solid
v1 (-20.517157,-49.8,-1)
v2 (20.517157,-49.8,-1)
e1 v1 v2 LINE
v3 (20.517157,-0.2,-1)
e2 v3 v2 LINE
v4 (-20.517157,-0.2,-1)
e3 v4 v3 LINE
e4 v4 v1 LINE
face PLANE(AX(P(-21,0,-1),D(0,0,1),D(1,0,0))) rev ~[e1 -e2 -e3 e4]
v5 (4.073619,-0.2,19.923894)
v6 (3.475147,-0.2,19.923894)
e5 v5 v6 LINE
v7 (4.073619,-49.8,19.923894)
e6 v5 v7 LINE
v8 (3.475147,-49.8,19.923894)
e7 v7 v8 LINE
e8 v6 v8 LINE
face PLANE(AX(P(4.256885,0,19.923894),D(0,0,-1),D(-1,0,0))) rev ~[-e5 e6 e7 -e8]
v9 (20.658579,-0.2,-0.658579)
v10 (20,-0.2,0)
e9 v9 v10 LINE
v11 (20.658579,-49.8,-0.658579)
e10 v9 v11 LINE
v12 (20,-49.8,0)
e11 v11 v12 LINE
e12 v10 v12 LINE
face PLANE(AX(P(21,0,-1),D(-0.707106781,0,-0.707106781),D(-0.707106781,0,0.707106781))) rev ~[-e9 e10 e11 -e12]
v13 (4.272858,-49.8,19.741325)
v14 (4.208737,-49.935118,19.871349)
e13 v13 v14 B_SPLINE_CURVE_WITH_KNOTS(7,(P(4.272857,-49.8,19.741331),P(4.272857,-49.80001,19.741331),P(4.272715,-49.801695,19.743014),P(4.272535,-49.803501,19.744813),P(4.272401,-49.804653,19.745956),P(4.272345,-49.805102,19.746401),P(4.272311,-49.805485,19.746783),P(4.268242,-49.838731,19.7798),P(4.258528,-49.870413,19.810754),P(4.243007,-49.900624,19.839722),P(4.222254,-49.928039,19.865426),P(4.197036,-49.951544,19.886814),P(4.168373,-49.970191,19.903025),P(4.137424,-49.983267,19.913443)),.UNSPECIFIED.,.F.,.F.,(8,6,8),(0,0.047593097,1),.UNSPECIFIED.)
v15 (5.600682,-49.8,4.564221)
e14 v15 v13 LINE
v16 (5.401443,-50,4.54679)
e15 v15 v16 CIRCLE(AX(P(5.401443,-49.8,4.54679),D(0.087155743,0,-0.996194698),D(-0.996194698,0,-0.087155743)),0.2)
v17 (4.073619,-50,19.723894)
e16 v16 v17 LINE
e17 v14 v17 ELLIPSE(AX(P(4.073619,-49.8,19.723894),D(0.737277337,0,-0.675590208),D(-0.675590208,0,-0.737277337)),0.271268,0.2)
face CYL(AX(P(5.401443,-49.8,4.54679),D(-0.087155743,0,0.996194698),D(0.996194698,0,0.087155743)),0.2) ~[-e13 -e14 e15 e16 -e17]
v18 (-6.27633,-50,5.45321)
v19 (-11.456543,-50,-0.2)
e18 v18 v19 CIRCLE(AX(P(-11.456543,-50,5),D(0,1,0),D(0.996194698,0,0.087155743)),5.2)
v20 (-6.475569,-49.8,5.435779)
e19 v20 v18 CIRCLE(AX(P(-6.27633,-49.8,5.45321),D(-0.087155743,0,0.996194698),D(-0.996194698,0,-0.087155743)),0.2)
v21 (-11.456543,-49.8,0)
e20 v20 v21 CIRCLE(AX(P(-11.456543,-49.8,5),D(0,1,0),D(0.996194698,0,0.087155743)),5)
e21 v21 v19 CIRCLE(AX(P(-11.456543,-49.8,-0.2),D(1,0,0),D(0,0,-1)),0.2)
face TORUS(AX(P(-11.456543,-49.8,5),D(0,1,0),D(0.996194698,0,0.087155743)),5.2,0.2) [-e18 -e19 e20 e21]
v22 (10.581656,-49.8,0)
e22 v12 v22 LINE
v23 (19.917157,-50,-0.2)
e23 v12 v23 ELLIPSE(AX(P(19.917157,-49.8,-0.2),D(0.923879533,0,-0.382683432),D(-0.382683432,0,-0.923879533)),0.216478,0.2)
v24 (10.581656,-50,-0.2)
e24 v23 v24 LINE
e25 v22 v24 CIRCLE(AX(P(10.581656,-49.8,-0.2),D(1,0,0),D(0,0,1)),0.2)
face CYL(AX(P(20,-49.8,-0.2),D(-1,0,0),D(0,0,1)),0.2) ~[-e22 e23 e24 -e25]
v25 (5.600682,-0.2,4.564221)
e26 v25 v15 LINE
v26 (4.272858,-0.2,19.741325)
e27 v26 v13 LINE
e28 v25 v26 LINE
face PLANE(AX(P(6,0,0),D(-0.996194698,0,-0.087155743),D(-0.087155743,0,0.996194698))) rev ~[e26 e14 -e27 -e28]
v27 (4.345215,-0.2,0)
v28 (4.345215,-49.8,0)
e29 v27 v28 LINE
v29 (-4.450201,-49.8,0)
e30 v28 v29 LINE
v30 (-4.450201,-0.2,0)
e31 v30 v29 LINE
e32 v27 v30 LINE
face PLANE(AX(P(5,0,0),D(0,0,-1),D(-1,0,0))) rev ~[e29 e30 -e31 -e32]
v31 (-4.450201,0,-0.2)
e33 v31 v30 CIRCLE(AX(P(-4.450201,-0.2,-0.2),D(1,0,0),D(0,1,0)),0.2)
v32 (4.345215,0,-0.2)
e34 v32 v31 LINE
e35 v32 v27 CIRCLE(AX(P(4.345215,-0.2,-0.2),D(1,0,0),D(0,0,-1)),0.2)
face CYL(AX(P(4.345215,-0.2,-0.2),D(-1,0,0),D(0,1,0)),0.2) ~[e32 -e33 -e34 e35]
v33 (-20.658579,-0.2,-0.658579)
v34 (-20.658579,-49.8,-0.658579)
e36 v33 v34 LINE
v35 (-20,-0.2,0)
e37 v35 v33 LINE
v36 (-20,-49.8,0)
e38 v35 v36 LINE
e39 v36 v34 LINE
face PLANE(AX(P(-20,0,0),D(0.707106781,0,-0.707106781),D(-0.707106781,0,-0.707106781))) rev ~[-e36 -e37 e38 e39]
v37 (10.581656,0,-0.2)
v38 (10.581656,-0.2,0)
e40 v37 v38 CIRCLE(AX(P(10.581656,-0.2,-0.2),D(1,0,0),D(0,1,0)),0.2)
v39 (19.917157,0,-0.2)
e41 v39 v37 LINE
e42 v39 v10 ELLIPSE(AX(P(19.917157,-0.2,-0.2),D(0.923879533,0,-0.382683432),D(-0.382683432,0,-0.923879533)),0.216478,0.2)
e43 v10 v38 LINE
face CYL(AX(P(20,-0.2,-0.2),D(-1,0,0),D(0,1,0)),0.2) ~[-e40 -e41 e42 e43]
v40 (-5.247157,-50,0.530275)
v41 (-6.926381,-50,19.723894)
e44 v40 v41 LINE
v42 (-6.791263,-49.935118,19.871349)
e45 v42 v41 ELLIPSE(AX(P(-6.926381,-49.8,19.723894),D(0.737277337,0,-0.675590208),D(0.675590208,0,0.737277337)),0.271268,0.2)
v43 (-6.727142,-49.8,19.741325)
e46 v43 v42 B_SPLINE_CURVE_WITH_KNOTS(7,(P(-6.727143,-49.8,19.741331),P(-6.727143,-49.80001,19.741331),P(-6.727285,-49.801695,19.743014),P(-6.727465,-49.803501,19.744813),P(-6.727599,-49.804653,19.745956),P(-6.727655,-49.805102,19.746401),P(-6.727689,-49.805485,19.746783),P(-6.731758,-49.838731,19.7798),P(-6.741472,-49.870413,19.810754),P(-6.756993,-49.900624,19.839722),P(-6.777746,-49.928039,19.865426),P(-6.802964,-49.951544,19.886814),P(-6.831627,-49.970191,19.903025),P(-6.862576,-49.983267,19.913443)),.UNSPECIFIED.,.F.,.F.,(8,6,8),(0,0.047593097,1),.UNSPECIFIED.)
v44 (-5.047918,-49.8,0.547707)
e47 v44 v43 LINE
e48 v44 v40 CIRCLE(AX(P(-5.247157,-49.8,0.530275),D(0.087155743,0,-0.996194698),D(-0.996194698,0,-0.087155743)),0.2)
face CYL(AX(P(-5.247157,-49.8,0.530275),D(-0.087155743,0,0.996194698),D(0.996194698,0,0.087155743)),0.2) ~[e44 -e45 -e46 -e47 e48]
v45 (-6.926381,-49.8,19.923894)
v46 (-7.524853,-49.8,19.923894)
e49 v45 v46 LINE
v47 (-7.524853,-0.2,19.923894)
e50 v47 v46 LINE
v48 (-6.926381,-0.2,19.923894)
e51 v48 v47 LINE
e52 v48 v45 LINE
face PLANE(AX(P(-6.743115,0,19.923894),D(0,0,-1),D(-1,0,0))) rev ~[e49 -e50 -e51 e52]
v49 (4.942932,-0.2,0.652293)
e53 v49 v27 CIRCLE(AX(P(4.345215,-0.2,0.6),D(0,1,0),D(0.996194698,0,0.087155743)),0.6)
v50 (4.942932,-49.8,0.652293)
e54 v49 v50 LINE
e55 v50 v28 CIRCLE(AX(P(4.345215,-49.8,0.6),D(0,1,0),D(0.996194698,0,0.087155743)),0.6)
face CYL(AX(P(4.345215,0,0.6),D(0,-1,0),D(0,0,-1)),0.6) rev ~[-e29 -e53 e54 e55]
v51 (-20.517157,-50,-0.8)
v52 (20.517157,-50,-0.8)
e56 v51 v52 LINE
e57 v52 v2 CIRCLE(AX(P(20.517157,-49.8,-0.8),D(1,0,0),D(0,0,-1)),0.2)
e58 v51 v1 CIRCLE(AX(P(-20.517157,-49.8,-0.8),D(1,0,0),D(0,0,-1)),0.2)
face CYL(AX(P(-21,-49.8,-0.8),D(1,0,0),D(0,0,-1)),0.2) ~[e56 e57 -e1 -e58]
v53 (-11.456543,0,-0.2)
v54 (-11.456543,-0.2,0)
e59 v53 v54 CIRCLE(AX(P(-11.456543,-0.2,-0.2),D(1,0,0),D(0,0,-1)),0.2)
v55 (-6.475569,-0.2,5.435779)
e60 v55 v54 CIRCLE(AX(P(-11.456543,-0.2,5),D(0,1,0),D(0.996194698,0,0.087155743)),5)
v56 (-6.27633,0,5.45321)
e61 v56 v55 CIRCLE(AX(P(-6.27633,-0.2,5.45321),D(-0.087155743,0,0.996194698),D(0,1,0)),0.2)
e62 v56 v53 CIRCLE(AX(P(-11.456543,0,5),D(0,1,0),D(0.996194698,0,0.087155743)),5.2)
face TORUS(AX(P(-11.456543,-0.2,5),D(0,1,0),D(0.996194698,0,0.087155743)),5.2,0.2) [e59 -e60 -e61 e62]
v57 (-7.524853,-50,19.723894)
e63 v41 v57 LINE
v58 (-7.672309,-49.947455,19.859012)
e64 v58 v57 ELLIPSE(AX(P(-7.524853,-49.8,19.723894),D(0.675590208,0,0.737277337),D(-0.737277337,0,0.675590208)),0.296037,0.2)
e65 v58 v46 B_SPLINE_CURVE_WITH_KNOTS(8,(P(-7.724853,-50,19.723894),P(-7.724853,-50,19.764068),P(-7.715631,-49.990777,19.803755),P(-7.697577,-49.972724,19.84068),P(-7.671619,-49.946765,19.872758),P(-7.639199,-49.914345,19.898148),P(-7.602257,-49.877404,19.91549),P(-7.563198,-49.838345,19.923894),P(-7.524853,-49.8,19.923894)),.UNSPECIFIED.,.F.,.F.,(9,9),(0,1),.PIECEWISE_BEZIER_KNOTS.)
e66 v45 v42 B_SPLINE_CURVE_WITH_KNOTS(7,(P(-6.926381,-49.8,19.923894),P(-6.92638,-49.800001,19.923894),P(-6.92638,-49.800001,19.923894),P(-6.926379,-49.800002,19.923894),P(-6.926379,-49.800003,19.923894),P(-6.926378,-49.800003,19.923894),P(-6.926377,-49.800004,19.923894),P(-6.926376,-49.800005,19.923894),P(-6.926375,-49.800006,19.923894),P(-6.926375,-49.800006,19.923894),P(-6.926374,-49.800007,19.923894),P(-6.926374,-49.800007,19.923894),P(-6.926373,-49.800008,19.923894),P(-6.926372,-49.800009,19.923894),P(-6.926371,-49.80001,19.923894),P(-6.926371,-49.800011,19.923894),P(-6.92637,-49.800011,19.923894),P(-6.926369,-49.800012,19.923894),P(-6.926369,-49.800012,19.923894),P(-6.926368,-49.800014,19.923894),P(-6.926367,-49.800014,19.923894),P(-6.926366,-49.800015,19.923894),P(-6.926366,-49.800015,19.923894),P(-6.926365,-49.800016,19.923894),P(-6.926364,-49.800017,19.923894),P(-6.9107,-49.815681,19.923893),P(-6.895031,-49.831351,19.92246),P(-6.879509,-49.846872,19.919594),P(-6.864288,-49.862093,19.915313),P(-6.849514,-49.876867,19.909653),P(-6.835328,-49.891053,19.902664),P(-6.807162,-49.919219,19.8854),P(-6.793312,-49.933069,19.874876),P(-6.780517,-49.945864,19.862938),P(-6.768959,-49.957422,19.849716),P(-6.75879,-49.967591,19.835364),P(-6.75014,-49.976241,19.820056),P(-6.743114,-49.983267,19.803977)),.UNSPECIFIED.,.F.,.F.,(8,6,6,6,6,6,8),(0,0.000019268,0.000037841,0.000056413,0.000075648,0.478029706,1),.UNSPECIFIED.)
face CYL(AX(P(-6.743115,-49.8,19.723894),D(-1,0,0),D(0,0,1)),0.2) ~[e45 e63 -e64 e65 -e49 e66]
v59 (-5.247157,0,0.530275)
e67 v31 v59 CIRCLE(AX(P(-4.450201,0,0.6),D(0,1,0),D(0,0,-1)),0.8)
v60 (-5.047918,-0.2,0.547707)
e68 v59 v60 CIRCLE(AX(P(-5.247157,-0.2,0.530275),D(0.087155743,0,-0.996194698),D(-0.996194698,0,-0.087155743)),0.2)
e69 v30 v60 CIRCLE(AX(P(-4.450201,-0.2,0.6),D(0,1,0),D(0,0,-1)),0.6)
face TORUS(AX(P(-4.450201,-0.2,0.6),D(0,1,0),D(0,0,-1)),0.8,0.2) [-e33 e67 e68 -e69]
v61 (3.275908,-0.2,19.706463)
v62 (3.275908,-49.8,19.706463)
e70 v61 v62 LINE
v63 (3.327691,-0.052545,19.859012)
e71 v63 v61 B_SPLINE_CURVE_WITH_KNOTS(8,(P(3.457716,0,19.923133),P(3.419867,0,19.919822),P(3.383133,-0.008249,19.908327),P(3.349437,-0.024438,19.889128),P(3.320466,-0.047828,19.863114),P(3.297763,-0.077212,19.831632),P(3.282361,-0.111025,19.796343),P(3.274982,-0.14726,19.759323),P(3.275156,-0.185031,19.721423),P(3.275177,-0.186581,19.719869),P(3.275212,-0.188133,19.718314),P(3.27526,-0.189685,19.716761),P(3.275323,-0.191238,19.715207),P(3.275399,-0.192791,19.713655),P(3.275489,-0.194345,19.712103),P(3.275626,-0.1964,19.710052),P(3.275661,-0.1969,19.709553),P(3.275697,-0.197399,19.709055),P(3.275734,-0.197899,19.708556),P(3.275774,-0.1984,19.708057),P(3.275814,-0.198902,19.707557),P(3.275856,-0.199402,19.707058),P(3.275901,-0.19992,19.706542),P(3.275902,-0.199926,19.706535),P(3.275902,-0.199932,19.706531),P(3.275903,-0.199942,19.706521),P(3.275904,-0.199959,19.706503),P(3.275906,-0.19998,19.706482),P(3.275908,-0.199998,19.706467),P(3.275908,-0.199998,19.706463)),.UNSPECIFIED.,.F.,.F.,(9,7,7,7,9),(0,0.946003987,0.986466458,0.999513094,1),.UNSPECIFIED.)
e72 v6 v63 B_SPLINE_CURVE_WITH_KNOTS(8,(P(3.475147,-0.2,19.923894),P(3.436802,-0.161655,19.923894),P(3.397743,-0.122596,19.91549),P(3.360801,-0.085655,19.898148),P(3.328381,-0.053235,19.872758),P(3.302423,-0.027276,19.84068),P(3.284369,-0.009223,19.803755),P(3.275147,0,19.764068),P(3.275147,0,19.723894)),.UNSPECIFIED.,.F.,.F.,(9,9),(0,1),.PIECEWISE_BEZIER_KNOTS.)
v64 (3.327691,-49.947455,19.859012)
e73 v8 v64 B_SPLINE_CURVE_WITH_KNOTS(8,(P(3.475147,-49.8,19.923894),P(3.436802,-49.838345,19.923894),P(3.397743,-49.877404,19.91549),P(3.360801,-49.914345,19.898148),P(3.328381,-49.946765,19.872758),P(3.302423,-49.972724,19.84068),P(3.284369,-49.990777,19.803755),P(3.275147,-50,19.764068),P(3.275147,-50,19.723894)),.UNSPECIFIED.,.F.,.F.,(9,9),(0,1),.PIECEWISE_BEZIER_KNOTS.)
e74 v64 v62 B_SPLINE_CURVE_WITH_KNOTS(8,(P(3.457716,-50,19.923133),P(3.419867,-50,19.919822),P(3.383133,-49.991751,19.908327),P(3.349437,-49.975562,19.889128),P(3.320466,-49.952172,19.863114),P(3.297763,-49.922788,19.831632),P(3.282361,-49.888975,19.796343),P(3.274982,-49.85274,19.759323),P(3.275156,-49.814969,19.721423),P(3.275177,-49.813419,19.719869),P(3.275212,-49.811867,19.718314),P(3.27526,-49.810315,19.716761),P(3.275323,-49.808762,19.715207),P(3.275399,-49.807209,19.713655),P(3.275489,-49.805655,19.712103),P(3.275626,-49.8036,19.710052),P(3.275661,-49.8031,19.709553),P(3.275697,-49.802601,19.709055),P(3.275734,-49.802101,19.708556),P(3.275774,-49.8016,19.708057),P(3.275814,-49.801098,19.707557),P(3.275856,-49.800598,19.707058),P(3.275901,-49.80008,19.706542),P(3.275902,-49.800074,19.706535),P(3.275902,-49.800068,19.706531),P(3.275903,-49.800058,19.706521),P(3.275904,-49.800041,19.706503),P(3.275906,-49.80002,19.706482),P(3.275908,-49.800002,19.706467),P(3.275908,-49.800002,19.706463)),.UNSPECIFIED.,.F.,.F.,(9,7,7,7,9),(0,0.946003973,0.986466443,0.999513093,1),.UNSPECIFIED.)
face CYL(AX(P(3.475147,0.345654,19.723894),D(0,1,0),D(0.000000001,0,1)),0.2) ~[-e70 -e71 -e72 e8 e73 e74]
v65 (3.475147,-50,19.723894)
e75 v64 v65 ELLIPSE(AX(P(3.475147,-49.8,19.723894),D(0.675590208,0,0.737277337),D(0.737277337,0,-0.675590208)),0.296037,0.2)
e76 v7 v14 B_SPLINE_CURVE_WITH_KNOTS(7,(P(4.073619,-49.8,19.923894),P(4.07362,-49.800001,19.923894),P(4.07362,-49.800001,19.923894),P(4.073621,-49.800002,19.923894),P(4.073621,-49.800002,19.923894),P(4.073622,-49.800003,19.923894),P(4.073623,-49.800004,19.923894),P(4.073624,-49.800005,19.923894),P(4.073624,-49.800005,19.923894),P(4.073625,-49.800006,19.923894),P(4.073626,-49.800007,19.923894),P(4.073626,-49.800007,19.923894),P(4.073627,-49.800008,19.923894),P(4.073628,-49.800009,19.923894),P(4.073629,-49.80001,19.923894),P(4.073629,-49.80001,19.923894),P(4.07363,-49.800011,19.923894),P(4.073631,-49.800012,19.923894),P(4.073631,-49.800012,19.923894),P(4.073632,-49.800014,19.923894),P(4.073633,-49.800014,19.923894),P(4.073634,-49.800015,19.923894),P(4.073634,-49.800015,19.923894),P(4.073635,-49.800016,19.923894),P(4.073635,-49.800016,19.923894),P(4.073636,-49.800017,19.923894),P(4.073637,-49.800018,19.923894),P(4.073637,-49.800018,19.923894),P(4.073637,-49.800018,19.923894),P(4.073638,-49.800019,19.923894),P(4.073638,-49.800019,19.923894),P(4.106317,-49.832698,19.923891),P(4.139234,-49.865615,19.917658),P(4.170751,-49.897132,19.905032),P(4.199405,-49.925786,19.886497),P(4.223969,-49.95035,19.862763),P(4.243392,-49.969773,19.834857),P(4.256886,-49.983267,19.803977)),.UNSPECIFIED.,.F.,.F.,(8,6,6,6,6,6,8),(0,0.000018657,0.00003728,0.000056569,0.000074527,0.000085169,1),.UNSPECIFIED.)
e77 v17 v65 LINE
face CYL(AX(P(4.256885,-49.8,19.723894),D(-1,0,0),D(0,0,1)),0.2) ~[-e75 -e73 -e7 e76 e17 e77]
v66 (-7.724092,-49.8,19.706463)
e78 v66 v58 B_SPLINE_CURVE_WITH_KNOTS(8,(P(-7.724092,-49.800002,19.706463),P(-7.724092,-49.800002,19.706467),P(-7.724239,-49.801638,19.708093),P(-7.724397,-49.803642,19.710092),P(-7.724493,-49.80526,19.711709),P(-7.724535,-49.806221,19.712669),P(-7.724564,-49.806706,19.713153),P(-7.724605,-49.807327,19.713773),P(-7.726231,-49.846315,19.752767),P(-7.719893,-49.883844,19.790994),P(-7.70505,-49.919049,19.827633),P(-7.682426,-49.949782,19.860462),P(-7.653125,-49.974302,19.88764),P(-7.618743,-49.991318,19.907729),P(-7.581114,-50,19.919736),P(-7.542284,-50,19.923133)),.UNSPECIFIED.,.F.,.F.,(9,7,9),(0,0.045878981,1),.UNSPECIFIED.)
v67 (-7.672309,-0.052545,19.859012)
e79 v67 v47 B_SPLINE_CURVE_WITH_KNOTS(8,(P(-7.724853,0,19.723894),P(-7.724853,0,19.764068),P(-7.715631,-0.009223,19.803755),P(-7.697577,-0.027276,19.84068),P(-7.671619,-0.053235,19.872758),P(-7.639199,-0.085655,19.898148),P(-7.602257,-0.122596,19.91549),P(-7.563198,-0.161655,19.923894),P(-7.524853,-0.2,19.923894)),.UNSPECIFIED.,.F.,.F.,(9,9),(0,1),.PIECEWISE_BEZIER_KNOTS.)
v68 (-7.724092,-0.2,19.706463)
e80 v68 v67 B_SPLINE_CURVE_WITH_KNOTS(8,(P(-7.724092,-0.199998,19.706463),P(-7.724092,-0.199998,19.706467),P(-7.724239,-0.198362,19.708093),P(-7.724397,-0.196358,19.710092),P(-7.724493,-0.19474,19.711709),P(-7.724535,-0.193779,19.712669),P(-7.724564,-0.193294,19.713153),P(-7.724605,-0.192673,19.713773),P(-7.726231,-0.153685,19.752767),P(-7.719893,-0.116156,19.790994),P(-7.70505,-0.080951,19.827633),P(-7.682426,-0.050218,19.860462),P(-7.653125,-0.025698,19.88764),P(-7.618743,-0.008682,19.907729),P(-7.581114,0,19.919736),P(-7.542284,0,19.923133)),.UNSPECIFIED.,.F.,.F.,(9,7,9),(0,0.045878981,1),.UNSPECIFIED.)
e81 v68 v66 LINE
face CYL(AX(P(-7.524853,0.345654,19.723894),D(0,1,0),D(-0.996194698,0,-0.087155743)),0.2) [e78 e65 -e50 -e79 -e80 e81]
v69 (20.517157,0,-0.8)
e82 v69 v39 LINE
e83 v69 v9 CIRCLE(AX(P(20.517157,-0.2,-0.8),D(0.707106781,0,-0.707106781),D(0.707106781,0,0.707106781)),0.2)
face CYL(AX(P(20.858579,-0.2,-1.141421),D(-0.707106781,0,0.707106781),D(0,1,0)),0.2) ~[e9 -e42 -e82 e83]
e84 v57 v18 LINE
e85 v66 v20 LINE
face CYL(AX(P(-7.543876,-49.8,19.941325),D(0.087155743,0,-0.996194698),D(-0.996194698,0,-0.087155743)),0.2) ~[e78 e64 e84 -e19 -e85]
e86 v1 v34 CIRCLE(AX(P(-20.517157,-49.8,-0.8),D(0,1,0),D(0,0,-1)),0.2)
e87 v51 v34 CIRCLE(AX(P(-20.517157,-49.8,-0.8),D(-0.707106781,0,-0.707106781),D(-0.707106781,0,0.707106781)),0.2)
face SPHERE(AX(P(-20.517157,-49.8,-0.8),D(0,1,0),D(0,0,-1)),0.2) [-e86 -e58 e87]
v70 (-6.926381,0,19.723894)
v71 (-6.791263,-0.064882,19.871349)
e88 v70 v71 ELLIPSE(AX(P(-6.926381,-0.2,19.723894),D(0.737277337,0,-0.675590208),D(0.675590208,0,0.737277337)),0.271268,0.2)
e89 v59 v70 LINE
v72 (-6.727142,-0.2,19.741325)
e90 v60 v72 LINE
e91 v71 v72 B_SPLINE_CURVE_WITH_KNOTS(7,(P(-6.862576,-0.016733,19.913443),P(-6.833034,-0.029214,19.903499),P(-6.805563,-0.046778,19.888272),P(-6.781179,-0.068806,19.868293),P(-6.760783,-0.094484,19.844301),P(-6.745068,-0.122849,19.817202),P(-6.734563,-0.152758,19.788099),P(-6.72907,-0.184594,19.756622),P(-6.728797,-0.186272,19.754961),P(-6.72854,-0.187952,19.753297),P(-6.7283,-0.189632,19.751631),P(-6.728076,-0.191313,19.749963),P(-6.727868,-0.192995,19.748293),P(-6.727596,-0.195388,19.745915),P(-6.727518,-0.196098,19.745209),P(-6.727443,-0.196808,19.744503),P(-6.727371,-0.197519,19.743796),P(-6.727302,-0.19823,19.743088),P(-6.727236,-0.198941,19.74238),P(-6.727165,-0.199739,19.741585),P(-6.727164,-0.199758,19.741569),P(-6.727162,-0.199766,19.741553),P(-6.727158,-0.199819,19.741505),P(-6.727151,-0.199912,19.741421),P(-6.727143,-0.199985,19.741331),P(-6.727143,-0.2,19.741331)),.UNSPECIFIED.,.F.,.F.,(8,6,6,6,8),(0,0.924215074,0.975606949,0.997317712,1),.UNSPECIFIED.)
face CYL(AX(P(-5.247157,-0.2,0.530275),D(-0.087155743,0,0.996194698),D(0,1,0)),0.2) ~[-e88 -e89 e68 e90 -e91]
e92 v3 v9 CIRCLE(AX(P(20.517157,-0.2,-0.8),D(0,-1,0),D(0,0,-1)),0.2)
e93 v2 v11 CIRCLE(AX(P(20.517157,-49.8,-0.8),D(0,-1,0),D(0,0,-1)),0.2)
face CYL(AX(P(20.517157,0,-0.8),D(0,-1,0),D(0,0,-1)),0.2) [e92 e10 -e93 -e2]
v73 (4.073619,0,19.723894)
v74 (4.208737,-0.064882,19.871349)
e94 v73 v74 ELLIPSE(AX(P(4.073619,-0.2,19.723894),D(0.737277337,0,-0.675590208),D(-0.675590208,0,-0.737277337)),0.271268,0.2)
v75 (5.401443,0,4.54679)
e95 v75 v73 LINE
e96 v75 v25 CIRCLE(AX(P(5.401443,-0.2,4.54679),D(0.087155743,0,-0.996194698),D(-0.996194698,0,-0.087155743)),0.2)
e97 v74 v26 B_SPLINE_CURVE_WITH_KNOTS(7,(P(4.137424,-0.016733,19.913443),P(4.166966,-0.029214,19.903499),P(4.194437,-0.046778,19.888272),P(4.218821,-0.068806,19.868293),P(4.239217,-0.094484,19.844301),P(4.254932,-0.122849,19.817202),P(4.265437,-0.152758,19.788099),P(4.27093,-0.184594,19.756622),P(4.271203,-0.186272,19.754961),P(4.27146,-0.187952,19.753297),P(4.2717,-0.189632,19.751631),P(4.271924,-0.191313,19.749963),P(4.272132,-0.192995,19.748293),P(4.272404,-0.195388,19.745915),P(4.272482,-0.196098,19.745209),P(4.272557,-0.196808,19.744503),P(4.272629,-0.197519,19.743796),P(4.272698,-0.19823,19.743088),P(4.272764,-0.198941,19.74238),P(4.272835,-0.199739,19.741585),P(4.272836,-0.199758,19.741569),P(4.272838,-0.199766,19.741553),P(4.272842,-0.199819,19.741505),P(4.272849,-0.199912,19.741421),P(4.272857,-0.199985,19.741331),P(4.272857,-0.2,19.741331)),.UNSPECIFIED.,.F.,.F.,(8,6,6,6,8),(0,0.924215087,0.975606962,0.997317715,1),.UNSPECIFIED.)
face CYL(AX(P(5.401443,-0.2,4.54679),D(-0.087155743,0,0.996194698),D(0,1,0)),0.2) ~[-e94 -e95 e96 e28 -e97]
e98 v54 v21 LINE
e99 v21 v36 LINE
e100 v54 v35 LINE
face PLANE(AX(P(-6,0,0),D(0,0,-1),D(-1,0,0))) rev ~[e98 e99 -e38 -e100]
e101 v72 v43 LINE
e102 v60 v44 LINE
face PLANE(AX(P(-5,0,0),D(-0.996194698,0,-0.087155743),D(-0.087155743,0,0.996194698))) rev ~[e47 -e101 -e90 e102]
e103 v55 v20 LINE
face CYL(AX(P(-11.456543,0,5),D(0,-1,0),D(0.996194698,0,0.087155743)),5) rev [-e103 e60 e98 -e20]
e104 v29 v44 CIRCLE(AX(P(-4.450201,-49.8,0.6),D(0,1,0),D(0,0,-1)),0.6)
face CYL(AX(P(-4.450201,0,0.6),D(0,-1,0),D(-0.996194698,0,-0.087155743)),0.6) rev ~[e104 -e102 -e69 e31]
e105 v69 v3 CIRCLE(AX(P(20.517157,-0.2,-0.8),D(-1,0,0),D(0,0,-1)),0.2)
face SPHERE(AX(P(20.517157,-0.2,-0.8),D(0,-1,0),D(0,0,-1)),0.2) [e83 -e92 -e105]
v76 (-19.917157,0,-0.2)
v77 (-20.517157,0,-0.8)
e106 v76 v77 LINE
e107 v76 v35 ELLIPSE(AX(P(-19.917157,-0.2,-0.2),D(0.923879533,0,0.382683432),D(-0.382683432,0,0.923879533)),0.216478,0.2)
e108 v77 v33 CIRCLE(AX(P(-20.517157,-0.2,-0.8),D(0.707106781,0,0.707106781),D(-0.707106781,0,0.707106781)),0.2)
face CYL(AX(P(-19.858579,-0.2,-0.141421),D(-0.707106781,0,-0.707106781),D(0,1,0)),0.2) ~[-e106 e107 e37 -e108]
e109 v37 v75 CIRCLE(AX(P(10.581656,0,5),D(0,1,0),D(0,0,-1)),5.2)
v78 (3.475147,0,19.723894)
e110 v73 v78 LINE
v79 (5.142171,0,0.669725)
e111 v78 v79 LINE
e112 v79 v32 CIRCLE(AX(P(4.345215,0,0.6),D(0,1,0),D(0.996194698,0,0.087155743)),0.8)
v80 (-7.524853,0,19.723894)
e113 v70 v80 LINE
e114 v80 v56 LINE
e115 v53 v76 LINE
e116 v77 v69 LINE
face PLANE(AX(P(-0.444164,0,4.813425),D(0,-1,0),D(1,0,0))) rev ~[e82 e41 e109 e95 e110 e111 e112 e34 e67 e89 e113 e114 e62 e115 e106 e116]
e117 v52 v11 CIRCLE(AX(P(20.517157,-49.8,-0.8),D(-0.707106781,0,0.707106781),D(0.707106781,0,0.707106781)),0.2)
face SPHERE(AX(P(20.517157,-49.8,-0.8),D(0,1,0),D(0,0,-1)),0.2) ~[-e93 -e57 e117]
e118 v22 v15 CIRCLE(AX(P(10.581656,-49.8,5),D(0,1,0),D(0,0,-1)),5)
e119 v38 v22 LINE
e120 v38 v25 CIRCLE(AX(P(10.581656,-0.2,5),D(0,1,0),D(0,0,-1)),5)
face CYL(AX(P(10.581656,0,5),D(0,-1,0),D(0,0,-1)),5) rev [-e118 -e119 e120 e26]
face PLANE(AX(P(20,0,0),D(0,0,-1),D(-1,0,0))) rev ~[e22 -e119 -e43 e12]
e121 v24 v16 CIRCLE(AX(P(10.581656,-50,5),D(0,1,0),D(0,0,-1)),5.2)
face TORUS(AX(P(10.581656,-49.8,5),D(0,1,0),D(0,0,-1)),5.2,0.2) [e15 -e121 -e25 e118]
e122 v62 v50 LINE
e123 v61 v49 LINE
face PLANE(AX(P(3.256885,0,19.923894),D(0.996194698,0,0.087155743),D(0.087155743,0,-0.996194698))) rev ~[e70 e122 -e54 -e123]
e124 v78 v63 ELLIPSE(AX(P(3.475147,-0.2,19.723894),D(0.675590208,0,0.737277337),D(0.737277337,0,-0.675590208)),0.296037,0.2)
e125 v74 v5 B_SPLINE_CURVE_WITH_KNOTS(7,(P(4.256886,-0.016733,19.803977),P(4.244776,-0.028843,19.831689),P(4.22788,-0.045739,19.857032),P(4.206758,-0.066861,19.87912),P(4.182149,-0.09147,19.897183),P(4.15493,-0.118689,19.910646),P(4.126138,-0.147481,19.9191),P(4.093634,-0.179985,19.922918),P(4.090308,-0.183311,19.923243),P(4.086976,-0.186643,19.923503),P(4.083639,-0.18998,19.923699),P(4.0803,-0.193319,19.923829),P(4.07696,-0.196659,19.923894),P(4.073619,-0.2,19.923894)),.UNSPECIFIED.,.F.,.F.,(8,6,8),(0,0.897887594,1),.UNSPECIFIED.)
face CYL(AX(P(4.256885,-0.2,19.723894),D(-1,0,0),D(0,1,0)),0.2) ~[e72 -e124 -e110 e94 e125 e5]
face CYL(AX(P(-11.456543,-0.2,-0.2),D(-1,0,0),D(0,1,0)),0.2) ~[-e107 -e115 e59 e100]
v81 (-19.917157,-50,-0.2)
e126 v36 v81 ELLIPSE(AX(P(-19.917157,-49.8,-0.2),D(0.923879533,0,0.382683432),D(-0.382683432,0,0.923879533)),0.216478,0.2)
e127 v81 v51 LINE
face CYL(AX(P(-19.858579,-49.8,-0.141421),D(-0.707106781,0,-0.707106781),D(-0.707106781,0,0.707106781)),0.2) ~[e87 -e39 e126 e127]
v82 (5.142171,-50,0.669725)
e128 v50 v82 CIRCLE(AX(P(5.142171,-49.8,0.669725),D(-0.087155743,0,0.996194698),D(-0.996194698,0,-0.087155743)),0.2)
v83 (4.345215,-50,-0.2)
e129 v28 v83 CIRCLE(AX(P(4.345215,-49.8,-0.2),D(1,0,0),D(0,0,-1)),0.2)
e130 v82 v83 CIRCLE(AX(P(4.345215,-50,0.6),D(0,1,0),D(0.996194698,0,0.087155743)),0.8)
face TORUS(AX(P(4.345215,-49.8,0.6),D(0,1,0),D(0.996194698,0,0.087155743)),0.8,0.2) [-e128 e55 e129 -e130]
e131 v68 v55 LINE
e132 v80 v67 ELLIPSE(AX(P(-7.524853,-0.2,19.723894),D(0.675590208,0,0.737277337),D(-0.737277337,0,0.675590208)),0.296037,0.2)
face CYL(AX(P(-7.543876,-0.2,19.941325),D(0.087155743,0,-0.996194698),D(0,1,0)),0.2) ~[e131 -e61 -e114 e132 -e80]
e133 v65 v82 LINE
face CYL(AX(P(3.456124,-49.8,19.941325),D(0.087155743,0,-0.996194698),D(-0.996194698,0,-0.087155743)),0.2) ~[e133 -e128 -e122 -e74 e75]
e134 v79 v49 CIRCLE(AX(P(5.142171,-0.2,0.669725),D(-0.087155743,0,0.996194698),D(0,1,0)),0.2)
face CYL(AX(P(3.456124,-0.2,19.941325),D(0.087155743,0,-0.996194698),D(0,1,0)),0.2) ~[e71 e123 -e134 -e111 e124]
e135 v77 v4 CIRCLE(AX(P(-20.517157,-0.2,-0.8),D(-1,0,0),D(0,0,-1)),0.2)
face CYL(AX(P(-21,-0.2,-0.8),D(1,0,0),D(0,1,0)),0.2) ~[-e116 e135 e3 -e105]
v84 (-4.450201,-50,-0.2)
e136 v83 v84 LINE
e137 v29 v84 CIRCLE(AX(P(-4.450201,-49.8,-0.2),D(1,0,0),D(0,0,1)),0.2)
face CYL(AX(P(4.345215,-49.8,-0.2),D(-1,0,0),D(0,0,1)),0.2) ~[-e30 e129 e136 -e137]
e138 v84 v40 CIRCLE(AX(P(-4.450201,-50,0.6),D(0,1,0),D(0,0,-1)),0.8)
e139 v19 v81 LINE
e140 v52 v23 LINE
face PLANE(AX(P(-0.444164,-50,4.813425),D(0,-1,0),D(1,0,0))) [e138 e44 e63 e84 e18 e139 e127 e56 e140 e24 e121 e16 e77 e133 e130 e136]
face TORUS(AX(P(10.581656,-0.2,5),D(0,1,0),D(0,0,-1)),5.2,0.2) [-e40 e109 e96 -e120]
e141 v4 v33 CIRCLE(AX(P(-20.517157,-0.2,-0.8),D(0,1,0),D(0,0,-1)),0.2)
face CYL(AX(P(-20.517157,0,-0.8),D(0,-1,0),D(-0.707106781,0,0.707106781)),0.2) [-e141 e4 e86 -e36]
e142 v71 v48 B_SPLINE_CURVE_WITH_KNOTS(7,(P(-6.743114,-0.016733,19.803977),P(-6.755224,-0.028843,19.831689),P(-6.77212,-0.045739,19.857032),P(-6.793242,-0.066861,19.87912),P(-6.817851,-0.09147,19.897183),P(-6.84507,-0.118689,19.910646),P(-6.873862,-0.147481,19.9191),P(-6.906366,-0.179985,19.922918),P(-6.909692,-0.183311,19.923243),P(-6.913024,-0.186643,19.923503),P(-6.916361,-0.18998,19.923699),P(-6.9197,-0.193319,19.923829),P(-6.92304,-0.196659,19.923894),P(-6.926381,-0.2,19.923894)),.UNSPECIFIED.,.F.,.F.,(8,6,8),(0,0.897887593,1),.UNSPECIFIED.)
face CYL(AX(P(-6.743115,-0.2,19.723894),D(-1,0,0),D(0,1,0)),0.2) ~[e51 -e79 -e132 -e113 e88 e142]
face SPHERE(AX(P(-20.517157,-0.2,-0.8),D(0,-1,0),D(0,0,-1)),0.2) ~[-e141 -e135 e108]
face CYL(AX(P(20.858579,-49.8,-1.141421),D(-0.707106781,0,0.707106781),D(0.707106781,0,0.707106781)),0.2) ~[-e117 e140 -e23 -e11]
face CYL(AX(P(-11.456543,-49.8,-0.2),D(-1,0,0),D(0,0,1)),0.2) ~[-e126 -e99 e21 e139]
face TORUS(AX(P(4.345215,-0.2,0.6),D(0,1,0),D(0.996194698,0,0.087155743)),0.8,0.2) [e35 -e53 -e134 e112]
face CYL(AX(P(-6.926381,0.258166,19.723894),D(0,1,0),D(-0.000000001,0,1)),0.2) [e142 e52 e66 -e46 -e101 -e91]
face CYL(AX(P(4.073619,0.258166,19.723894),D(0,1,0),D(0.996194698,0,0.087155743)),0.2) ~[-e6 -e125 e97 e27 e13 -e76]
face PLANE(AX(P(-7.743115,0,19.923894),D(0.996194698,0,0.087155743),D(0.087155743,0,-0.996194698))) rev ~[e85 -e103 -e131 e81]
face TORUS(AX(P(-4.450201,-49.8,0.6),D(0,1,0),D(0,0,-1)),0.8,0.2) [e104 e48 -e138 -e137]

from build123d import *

# Parameters (mm, degrees)
F1_DEPTH    = 50
F2_R        = 5
F3_R        = 0.6
F4_R        = 0.2
F5_T1_DEPTH = 50.516331174
F5_T3_DEPTH = 50.6913085011


# Not quite as in the source:
# - a fillet or chamfer that OpenCascade refuses, or shapes differently, is made with other operations: its cross-section is extruded or revolved along the edge and cut away or added


with BuildPart() as f1:
    # F0 (on Front) → F1 (new body)
    with BuildSketch(Plane.XZ):
        Polygon((5, 0), (-5, 0), (-6.743114855, 19.9238939618), (-7.743114855, 19.9238939618), (-6, 0), (-20, 0), (-21, -1), (21, -1), (20, 0), (6, 0), (4.256885145, 19.9238939618), (3.256885145, 19.9238939618), align=None)
    extrude(amount=F1_DEPTH)

    # F2
    f2_edges = [f1.edges().sort_by_distance(p)[0] for p in [
        (-6, -25, 0),
        (6, -25, 0),
    ]]
    fillet(f2_edges, radius=F2_R)

    # F3
    f3_edges = [f1.edges().sort_by_distance(p)[0] for p in [
        (-5, -25, 0),
        (5, -25, 0),
    ]]
    fillet(f3_edges, radius=F3_R)

    # F4
    f4_edges = [f1.edges().sort_by_distance(p)[0] for p in [
        (-21, -25, -1),
        (21, -25, -1),
        (0, 0, -1),
        (0, -50, -1),
        (-5.895516, -50, 10.2358),
        (-4.855555, -50, 0.157634),
        (-7.243115, -50, 19.923894),
        (-0.052493, -50, 0),
        (-7.109342, -50, 12.679836),
        (4.787581, -50, 0.194646),
        (-7.770156, -50, 1.622049),
        (4.099908, -50, 10.288094),
        (-15.728271, -50, 0),
        (3.756885, -50, 19.923894),
        (-20.5, -50, -0.5),
        (4.928784, -50, 12.244058),
        (7.203705, -50, 1.313613),
        (20.5, -50, -0.5),
        (15.290828, -50, 0),
        (-5.895516, 0, 10.2358),
        (-4.855555, 0, 0.157634),
        (-7.243115, 0, 19.923894),
        (-0.052493, 0, 0),
        (-7.109342, 0, 12.679836),
        (4.787581, 0, 0.194646),
        (-7.770156, 0, 1.622049),
        (4.099908, 0, 10.288094),
        (-15.728271, 0, 0),
        (3.756885, 0, 19.923894),
        (-20.5, 0, -0.5),
        (4.928784, 0, 12.244058),
        (7.203705, 0, 1.313613),
        (20.5, 0, -0.5),
        (15.290828, 0, 0),
    ]]
    fillet(f4_edges, radius=F4_R)

    # F5: fillet of radius 0.2 on 8 edges, made by hand

    # F5_s2 → F5_t1 (cut)
    with BuildSketch(Plane.XZ.offset(-0.258165587)):
        with BuildLine():
            ThreePointArc((-6.9263810898, 19.9238939618), (-6.7912630482, 19.8713494292), (-6.7271421501, 19.7413251104))
            Line((-6.7271421501, 19.7413251104), (-6.743114855, 19.9238939618))
            Line((-6.743114855, 19.9238939618), (-6.9263810898, 19.9238939618))
        make_face()
        with BuildLine():
            ThreePointArc((4.2728578499, 19.7413251104), (4.2087369518, 19.8713494292), (4.0736189102, 19.9238939618))
            Line((4.0736189102, 19.9238939618), (4.256885145, 19.9238939618))
            Line((4.256885145, 19.9238939618), (4.2728578499, 19.7413251104))
        make_face()
    extrude(amount=F5_T1_DEPTH, mode=Mode.SUBTRACT)

    # F5_s4 → F5_t3 (cut)
    with BuildSketch(Plane.XZ.offset(-0.3456542505)):
        with BuildLine():
            ThreePointArc((-7.7240920944, 19.7064628133), (-7.6723086221, 19.8590120034), (-7.5248531547, 19.9238939618))
            Line((-7.5248531547, 19.9238939618), (-7.743114855, 19.9238939618))
            Line((-7.743114855, 19.9238939618), (-7.7240920944, 19.7064628133))
        make_face()
        with BuildLine():
            ThreePointArc((3.4751468453, 19.9238939618), (3.3276913779, 19.8590120034), (3.2759079056, 19.7064628133))
            Line((3.2759079056, 19.7064628133), (3.256885145, 19.9238939618))
            Line((3.256885145, 19.9238939618), (3.4751468453, 19.9238939618))
        make_face()
    extrude(amount=F5_T3_DEPTH, mode=Mode.SUBTRACT)


solid = f1.part
